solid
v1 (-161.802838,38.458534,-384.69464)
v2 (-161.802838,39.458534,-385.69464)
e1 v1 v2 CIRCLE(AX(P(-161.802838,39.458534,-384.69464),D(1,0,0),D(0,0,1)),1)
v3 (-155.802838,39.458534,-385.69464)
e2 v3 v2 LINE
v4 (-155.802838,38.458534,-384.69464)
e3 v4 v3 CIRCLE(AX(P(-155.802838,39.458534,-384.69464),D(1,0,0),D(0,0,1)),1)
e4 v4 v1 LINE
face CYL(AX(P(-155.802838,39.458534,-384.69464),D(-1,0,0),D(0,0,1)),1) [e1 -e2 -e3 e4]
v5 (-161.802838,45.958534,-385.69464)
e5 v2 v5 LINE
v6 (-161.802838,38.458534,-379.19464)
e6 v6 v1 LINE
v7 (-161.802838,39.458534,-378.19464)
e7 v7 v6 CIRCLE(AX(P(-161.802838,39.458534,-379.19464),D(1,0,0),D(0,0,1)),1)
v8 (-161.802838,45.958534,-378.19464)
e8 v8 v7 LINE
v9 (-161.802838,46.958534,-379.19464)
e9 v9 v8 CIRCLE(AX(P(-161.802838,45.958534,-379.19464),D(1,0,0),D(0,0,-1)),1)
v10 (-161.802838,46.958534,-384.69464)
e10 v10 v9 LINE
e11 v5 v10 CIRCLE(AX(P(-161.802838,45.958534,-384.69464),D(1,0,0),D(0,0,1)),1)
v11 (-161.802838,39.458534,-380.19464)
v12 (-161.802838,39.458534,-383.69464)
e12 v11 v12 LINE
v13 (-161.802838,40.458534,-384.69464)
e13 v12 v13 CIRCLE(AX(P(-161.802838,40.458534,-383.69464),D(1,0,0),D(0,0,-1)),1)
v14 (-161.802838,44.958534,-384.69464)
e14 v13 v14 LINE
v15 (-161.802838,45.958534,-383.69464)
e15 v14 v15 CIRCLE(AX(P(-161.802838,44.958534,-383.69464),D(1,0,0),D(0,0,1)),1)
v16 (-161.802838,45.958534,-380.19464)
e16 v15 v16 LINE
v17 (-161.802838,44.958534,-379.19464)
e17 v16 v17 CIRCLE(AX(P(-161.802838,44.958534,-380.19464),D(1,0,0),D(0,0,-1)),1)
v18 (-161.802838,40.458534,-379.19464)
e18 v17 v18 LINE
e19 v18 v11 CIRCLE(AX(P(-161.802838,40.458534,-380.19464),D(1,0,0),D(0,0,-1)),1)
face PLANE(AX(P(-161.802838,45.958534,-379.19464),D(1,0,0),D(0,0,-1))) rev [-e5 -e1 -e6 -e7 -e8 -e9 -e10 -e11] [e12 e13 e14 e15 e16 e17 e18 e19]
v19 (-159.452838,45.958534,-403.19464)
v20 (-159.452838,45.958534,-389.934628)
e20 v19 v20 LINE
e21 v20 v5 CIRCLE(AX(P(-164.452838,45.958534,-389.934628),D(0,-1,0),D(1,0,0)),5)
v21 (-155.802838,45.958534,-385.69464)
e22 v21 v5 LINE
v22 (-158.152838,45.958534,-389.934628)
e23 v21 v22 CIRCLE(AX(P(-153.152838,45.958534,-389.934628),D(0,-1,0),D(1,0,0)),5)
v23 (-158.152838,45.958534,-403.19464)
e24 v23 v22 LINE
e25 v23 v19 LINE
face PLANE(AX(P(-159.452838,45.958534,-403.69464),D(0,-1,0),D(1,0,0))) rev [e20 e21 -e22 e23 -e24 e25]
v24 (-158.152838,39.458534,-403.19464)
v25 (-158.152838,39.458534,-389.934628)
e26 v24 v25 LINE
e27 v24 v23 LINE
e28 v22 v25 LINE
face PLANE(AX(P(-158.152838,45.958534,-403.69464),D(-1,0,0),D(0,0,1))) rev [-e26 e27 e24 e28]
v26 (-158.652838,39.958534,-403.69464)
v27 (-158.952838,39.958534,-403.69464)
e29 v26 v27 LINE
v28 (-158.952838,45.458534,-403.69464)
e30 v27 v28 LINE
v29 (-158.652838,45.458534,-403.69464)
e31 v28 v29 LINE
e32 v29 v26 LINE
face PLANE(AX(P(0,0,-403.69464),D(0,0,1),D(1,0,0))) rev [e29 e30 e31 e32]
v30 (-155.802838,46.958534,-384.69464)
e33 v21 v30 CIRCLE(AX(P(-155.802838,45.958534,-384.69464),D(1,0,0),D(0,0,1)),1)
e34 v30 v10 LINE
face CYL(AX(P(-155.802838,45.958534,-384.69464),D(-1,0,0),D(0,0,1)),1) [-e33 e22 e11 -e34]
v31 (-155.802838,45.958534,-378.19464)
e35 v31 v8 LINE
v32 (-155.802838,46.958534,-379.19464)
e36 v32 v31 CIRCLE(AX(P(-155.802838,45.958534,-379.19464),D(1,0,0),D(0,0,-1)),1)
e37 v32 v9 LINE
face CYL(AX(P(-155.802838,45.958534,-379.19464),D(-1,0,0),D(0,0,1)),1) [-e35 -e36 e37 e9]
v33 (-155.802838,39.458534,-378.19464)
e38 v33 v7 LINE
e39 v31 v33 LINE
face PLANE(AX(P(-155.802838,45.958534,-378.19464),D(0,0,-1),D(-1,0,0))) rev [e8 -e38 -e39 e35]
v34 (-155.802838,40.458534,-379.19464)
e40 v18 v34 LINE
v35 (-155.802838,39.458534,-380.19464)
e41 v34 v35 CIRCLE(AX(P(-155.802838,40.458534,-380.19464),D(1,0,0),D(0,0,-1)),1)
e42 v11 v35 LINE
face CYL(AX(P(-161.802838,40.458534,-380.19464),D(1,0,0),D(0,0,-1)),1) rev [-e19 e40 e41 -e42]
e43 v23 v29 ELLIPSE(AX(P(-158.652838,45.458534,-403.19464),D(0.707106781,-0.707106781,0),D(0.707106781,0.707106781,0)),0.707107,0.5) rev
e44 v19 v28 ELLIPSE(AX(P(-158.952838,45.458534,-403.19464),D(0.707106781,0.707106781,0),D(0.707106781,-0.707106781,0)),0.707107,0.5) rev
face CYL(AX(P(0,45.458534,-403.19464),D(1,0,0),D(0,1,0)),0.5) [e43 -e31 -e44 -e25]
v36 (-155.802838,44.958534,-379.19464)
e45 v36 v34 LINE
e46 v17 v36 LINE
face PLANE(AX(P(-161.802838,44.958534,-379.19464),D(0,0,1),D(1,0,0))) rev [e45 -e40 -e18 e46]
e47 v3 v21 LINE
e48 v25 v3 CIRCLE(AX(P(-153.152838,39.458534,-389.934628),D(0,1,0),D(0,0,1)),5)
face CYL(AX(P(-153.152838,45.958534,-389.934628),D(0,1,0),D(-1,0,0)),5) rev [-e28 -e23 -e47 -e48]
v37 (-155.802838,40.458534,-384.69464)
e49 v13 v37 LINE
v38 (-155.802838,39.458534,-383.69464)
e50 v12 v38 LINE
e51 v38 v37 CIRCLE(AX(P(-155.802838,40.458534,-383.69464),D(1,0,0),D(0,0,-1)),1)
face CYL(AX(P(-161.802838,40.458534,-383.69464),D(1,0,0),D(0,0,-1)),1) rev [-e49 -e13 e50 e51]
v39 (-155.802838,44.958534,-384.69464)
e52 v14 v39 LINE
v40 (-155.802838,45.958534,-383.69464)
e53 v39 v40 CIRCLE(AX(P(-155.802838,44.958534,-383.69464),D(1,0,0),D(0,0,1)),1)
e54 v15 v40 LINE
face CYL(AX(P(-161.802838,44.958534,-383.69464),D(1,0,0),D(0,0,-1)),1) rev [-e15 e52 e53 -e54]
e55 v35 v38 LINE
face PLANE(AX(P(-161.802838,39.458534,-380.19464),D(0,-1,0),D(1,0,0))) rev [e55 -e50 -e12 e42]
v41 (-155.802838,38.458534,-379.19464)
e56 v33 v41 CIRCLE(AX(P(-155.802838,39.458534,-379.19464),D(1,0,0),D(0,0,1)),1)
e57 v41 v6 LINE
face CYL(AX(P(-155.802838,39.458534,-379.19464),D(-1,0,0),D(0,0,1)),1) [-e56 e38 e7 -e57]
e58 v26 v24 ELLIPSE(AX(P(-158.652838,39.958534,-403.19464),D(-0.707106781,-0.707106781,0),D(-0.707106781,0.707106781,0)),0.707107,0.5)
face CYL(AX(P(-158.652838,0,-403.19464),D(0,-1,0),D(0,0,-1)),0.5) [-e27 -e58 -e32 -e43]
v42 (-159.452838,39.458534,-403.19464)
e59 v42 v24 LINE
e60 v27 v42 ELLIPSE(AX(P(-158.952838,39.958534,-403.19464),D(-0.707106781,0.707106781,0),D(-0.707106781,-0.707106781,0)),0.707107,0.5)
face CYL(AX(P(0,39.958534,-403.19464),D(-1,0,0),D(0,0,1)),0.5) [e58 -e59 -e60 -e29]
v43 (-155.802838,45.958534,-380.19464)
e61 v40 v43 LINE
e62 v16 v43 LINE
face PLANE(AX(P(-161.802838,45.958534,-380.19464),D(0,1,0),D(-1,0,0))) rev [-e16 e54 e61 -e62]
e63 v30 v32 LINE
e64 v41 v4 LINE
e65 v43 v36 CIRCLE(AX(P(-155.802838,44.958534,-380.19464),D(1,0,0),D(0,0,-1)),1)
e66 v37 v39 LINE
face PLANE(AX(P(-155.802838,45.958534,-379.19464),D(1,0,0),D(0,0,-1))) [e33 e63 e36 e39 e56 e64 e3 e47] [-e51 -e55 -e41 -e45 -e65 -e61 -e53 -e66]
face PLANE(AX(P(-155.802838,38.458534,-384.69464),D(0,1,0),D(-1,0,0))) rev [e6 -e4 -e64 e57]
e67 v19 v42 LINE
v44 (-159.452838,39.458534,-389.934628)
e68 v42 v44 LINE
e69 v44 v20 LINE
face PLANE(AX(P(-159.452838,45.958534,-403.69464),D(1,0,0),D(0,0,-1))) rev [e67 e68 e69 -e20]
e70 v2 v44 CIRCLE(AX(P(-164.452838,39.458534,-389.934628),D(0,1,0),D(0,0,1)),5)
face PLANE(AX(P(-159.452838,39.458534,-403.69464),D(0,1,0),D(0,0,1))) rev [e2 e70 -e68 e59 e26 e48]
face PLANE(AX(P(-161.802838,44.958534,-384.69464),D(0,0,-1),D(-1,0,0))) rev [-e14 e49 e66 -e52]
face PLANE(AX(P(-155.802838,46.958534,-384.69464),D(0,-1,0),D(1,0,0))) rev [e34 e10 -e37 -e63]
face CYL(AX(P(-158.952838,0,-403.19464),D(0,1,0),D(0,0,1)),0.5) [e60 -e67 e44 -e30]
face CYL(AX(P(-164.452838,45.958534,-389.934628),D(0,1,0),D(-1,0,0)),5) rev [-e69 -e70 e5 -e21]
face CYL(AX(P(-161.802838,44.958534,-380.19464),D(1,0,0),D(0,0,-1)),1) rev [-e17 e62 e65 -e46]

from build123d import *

# Parameters (mm, degrees)
RESSALTO_EXTRUS_O1_DEPTH = 6
CORTE_EXTRUS_O1_DEPTH    = 389.589061789
ESBO_O3_W                = 1.3
ESBO_O3_H                = 6.5
RESSALTO_EXTRUS_O2_DEPTH = 18
FILETE1_R                = 5
FILETE3_R                = 0.5


with BuildPart() as part:
    # Esboço1 → Ressalto-extrusão1 (new body)
    with BuildSketch(Plane(origin=(-161.802837797, 0, 0), x_dir=(0, 0, -1), z_dir=(1, 0, 0))):
        with BuildLine():
            Line((384.694639655, 46.958533656), (379.194639655, 46.958533656))
            ThreePointArc((379.194639655, 46.958533656), (378.487532874, 46.665640437), (378.194639655, 45.958533656))
            Line((378.194639655, 45.958533656), (378.194639655, 39.458533656))
            ThreePointArc((378.194639655, 39.458533656), (378.487532874, 38.751426875), (379.194639655, 38.458533656))
            Line((379.194639655, 38.458533656), (384.694639655, 38.458533656))
            ThreePointArc((384.694639655, 38.458533656), (385.401746437, 38.751426875), (385.694639655, 39.458533656))
            Line((385.694639655, 39.458533656), (385.694639655, 45.958533656))
            ThreePointArc((385.694639655, 45.958533656), (385.401746437, 46.665640437), (384.694639655, 46.958533656))
        make_face()
    extrude(amount=RESSALTO_EXTRUS_O1_DEPTH)

    # Esboço2 → Corte-extrusão1 (cut, through all)
    with BuildSketch(Plane(origin=(-155.802837797, 0, 0), x_dir=(0, 0, -1), z_dir=(1, 0, 0))):
        with BuildLine():
            Line((380.194639655, 45.958533656), (383.694639655, 45.958533656))
            ThreePointArc((383.694639655, 45.958533656), (384.401746437, 45.665640437), (384.694639655, 44.958533656))
            Line((384.694639655, 44.958533656), (384.694639655, 40.458533656))
            ThreePointArc((384.694639655, 40.458533656), (384.401746437, 39.751426875), (383.694639655, 39.458533656))
            Line((383.694639655, 39.458533656), (380.194639655, 39.458533656))
            ThreePointArc((380.194639655, 39.458533656), (379.487532874, 39.751426875), (379.194639655, 40.458533656))
            Line((379.194639655, 40.458533656), (379.194639655, 44.958533656))
            ThreePointArc((379.194639655, 44.958533656), (379.487532874, 45.665640437), (380.194639655, 45.958533656))
        make_face()
    extrude(amount=-CORTE_EXTRUS_O1_DEPTH, mode=Mode.SUBTRACT)

    # Esboço3 → Ressalto-extrusão2 (add)
    with BuildSketch(Plane(origin=(0, 0, -385.694639655), x_dir=(-1, 0, 0), z_dir=(0, 0, -1))):
        with Locations((158.802837797, 42.708533656)):
            Rectangle(ESBO_O3_W, ESBO_O3_H)
    extrude(amount=RESSALTO_EXTRUS_O2_DEPTH)

    # Filete1
    # the kernel refuses this fillet: 5 mm, written as the material it adds along each edge
    with BuildSketch(Plane(origin=(-159.452837797, 39.458533656, -385.694639655), x_dir=(-1, 0, 0), z_dir=(0, 1, 0)), Plane(origin=(-158.152837797, 45.958533656, -385.694639655), x_dir=(1, 0, 0), z_dir=(0, -1, 0))) as filete1_piece_1:
        with BuildLine():
            CenterArc((5, -4.239988208), FILETE1_R, 122.005454828, 57.994545172)
            Line((0, -4.239988208), (-0.1, -4.239988208))
            Line((-0.1, -4.239988208), (-0.1, 0))
            Line((-0.1, 0), (0, 0.1))
            ThreePointArc((0, 0.1), (1.175, 0.1), (2.297, 0.084799764))
            Line((2.297, 0.084799764), (2.35, 0))
        make_face()
    extrude(amount=6.5)

    # Filete3
    filete3_edges = [part.edges().sort_by_distance(p)[0] for p in [
        (-159.452837797, 42.708533656, -403.694639655),
        (-158.802837797, 45.958533656, -403.694639655),
        (-158.152837797, 42.708533656, -403.694639655),
        (-158.802837797, 39.458533656, -403.694639655),
    ]]
    fillet(filete3_edges, radius=FILETE3_R)


solid = part.part
